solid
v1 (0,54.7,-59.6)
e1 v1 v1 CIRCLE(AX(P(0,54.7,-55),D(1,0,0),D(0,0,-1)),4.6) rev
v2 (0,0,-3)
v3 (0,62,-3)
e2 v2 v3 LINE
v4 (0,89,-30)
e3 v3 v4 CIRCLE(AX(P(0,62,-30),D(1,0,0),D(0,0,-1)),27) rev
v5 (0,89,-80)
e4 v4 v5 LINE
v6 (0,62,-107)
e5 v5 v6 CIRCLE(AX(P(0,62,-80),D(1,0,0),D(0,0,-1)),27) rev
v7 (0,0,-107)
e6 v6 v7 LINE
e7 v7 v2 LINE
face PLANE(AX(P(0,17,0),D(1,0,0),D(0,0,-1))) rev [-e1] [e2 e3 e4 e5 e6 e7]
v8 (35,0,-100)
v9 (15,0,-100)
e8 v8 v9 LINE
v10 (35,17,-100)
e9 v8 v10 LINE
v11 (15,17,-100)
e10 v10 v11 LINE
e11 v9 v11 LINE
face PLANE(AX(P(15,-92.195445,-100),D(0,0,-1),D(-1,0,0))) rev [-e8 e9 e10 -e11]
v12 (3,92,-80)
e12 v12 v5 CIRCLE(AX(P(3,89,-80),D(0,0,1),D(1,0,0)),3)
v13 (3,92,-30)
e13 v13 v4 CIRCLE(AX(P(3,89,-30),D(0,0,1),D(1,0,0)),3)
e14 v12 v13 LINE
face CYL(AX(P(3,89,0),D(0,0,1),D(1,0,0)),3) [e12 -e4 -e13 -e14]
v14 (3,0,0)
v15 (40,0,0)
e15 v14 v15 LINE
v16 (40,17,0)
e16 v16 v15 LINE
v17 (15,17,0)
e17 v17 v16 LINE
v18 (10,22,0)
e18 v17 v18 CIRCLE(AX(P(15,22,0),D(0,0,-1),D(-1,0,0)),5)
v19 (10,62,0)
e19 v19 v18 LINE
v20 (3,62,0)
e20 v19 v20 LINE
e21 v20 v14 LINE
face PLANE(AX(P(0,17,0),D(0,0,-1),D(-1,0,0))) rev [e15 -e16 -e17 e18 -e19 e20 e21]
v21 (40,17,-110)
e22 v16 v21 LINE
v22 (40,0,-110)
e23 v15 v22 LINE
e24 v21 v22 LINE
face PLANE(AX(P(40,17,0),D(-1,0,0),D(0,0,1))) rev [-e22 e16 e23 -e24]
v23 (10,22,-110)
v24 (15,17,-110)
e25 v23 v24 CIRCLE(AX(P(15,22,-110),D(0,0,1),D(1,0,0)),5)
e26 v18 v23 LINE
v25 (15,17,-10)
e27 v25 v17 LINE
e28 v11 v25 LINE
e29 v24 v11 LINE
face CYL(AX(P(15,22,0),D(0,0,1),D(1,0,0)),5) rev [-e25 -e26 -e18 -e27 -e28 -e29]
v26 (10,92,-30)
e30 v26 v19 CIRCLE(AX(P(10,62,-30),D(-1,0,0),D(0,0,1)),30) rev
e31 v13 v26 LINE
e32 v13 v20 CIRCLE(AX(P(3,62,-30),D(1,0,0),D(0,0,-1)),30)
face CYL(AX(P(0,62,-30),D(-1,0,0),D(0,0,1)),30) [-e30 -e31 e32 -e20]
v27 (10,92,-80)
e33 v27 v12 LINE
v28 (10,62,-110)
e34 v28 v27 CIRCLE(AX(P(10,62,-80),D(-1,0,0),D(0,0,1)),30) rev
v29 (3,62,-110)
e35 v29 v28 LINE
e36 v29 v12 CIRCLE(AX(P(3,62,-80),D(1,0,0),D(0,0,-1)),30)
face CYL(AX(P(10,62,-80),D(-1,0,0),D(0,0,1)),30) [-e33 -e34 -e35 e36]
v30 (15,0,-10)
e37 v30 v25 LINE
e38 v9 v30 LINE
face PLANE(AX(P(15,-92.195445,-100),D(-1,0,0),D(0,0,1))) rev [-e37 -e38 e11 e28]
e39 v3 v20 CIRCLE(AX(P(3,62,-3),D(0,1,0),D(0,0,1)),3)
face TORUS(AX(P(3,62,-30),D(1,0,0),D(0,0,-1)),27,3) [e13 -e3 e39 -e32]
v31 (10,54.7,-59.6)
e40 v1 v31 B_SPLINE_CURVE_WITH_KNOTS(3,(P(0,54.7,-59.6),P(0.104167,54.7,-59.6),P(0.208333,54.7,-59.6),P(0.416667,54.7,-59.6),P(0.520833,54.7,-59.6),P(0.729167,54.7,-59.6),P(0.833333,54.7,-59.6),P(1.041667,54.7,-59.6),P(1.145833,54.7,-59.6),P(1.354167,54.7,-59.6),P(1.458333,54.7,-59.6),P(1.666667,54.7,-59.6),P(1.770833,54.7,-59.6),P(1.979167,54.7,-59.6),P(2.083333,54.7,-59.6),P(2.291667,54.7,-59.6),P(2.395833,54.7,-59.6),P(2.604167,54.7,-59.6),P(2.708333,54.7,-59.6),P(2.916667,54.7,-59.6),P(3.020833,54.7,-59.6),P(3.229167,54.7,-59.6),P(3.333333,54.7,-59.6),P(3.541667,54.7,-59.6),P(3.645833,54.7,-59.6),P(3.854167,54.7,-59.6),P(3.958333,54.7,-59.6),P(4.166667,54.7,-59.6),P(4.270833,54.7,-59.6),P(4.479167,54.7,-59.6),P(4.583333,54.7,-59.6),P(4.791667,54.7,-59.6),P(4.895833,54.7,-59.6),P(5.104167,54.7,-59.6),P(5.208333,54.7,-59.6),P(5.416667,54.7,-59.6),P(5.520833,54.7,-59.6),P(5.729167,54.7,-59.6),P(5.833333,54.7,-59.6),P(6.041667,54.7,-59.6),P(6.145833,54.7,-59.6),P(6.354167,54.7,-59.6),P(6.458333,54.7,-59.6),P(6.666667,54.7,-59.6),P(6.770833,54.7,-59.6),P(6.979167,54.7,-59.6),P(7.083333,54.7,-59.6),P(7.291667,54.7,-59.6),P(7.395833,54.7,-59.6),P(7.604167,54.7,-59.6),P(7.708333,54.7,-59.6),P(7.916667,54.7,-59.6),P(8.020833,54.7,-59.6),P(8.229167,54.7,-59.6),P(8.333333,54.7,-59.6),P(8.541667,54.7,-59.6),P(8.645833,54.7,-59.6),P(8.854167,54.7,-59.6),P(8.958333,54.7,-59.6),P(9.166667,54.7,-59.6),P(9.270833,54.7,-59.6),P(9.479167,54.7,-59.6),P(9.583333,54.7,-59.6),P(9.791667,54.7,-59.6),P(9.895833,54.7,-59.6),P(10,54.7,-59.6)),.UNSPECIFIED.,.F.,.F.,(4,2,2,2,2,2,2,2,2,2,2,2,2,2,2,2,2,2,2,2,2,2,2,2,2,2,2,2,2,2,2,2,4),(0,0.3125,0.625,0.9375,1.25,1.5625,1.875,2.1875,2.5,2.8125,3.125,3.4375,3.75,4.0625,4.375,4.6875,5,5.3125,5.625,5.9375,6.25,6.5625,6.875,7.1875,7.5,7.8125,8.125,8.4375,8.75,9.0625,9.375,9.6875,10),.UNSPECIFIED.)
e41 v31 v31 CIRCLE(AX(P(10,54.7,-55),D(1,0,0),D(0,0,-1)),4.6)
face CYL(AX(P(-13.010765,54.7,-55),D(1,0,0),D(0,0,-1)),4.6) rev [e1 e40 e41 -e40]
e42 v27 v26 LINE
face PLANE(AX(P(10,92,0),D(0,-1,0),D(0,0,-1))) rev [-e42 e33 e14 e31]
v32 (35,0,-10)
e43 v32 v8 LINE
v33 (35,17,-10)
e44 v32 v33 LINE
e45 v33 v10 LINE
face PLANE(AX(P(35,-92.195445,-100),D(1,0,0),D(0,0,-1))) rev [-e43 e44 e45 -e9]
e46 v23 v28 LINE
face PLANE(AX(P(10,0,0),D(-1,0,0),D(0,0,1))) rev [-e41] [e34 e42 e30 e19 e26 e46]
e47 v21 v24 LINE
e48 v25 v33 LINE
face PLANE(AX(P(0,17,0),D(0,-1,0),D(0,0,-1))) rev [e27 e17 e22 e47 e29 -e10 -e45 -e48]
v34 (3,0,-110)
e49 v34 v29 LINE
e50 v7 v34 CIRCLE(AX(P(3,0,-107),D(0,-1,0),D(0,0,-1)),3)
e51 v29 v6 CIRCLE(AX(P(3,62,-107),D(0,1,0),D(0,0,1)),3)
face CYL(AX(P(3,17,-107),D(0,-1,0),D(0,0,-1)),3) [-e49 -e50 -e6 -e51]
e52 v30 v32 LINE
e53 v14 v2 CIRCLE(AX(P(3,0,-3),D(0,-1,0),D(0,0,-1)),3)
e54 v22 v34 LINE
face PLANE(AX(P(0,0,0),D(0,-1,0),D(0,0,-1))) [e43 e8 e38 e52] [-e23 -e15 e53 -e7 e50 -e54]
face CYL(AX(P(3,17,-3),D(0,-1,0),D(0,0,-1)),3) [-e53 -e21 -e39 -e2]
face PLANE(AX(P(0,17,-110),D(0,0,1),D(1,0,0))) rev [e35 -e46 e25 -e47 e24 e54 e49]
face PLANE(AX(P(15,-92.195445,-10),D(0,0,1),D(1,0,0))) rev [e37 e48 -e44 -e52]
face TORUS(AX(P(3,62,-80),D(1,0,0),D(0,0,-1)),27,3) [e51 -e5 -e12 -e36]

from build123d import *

# Parameters (mm, degrees)
SKETCH1_W           = 40
SKETCH1_H           = 110
BOSS_EXTRUDE1_DEPTH = 17
SKETCH4_W           = 110
SKETCH4_H           = 75
BOSS_EXTRUDE2_DEPTH = 10
SKETCH5_W           = 20
SKETCH5_H           = 90
CUT_EXTRUDE1_DEPTH  = 17
SKETCH6_R           = 4.6
CUT_EXTRUDE2_DEPTH  = 10
FILLET1_R           = 30
FILLET2_R           = 3
FILLET3_R           = 5


with BuildPart() as part:
    # Sketch1 → Boss-Extrude1 (new body)
    with BuildSketch(Plane(origin=(0, 0, 0), x_dir=(1, 0, 0), z_dir=(0, 1, 0))):
        with Locations((20, 55)):
            Rectangle(SKETCH1_W, SKETCH1_H)
    extrude(amount=BOSS_EXTRUDE1_DEPTH)

    # Sketch4 → Boss-Extrude2 (add)
    with BuildSketch(Plane(origin=(0, 0, 0), x_dir=(0, 0, -1), z_dir=(1, 0, 0))):
        with Locations((55, 54.5)):
            Rectangle(SKETCH4_W, SKETCH4_H)
    extrude(amount=BOSS_EXTRUDE2_DEPTH)

    # Sketch5 → Cut-Extrude1 (cut)
    with BuildSketch(Plane(origin=(0, 17, 0), x_dir=(1, 0, 0), z_dir=(0, 1, 0))):
        with Locations((25, 55)):
            Rectangle(SKETCH5_W, SKETCH5_H)
    extrude(amount=-CUT_EXTRUDE1_DEPTH, mode=Mode.SUBTRACT)

    # Sketch6 → Cut-Extrude2 (cut)
    with BuildSketch(Plane(origin=(10, 0, 0), x_dir=(0, 0, -1), z_dir=(1, 0, 0))):
        with Locations((55, 54.7)):
            Circle(SKETCH6_R)
    extrude(amount=-CUT_EXTRUDE2_DEPTH, mode=Mode.SUBTRACT)

    # Fillet1
    fillet1_edges = [part.edges().sort_by_distance(p)[0] for p in [
        (5, 92, 0),
        (5, 92, -110),
    ]]
    fillet(fillet1_edges, radius=FILLET1_R)

    # Fillet2
    fillet2_edges = [part.edges().sort_by_distance(p)[0] for p in [
        (0, 31, 0),
        (0, 92, -55),
        (0, 31, -110),
        (0, 83.213203436, -101.213203436),
        (0, 83.213203436, -8.786796564),
    ]]
    fillet(fillet2_edges, radius=FILLET2_R)

    # Fillet3
    fillet3_edges = [part.edges().sort_by_distance(p)[0] for p in [
        (10, 17, -55),
    ]]
    fillet(fillet3_edges, radius=FILLET3_R - 0.0001)  # a hair under: the kernel refuses the full size


solid = part.part
